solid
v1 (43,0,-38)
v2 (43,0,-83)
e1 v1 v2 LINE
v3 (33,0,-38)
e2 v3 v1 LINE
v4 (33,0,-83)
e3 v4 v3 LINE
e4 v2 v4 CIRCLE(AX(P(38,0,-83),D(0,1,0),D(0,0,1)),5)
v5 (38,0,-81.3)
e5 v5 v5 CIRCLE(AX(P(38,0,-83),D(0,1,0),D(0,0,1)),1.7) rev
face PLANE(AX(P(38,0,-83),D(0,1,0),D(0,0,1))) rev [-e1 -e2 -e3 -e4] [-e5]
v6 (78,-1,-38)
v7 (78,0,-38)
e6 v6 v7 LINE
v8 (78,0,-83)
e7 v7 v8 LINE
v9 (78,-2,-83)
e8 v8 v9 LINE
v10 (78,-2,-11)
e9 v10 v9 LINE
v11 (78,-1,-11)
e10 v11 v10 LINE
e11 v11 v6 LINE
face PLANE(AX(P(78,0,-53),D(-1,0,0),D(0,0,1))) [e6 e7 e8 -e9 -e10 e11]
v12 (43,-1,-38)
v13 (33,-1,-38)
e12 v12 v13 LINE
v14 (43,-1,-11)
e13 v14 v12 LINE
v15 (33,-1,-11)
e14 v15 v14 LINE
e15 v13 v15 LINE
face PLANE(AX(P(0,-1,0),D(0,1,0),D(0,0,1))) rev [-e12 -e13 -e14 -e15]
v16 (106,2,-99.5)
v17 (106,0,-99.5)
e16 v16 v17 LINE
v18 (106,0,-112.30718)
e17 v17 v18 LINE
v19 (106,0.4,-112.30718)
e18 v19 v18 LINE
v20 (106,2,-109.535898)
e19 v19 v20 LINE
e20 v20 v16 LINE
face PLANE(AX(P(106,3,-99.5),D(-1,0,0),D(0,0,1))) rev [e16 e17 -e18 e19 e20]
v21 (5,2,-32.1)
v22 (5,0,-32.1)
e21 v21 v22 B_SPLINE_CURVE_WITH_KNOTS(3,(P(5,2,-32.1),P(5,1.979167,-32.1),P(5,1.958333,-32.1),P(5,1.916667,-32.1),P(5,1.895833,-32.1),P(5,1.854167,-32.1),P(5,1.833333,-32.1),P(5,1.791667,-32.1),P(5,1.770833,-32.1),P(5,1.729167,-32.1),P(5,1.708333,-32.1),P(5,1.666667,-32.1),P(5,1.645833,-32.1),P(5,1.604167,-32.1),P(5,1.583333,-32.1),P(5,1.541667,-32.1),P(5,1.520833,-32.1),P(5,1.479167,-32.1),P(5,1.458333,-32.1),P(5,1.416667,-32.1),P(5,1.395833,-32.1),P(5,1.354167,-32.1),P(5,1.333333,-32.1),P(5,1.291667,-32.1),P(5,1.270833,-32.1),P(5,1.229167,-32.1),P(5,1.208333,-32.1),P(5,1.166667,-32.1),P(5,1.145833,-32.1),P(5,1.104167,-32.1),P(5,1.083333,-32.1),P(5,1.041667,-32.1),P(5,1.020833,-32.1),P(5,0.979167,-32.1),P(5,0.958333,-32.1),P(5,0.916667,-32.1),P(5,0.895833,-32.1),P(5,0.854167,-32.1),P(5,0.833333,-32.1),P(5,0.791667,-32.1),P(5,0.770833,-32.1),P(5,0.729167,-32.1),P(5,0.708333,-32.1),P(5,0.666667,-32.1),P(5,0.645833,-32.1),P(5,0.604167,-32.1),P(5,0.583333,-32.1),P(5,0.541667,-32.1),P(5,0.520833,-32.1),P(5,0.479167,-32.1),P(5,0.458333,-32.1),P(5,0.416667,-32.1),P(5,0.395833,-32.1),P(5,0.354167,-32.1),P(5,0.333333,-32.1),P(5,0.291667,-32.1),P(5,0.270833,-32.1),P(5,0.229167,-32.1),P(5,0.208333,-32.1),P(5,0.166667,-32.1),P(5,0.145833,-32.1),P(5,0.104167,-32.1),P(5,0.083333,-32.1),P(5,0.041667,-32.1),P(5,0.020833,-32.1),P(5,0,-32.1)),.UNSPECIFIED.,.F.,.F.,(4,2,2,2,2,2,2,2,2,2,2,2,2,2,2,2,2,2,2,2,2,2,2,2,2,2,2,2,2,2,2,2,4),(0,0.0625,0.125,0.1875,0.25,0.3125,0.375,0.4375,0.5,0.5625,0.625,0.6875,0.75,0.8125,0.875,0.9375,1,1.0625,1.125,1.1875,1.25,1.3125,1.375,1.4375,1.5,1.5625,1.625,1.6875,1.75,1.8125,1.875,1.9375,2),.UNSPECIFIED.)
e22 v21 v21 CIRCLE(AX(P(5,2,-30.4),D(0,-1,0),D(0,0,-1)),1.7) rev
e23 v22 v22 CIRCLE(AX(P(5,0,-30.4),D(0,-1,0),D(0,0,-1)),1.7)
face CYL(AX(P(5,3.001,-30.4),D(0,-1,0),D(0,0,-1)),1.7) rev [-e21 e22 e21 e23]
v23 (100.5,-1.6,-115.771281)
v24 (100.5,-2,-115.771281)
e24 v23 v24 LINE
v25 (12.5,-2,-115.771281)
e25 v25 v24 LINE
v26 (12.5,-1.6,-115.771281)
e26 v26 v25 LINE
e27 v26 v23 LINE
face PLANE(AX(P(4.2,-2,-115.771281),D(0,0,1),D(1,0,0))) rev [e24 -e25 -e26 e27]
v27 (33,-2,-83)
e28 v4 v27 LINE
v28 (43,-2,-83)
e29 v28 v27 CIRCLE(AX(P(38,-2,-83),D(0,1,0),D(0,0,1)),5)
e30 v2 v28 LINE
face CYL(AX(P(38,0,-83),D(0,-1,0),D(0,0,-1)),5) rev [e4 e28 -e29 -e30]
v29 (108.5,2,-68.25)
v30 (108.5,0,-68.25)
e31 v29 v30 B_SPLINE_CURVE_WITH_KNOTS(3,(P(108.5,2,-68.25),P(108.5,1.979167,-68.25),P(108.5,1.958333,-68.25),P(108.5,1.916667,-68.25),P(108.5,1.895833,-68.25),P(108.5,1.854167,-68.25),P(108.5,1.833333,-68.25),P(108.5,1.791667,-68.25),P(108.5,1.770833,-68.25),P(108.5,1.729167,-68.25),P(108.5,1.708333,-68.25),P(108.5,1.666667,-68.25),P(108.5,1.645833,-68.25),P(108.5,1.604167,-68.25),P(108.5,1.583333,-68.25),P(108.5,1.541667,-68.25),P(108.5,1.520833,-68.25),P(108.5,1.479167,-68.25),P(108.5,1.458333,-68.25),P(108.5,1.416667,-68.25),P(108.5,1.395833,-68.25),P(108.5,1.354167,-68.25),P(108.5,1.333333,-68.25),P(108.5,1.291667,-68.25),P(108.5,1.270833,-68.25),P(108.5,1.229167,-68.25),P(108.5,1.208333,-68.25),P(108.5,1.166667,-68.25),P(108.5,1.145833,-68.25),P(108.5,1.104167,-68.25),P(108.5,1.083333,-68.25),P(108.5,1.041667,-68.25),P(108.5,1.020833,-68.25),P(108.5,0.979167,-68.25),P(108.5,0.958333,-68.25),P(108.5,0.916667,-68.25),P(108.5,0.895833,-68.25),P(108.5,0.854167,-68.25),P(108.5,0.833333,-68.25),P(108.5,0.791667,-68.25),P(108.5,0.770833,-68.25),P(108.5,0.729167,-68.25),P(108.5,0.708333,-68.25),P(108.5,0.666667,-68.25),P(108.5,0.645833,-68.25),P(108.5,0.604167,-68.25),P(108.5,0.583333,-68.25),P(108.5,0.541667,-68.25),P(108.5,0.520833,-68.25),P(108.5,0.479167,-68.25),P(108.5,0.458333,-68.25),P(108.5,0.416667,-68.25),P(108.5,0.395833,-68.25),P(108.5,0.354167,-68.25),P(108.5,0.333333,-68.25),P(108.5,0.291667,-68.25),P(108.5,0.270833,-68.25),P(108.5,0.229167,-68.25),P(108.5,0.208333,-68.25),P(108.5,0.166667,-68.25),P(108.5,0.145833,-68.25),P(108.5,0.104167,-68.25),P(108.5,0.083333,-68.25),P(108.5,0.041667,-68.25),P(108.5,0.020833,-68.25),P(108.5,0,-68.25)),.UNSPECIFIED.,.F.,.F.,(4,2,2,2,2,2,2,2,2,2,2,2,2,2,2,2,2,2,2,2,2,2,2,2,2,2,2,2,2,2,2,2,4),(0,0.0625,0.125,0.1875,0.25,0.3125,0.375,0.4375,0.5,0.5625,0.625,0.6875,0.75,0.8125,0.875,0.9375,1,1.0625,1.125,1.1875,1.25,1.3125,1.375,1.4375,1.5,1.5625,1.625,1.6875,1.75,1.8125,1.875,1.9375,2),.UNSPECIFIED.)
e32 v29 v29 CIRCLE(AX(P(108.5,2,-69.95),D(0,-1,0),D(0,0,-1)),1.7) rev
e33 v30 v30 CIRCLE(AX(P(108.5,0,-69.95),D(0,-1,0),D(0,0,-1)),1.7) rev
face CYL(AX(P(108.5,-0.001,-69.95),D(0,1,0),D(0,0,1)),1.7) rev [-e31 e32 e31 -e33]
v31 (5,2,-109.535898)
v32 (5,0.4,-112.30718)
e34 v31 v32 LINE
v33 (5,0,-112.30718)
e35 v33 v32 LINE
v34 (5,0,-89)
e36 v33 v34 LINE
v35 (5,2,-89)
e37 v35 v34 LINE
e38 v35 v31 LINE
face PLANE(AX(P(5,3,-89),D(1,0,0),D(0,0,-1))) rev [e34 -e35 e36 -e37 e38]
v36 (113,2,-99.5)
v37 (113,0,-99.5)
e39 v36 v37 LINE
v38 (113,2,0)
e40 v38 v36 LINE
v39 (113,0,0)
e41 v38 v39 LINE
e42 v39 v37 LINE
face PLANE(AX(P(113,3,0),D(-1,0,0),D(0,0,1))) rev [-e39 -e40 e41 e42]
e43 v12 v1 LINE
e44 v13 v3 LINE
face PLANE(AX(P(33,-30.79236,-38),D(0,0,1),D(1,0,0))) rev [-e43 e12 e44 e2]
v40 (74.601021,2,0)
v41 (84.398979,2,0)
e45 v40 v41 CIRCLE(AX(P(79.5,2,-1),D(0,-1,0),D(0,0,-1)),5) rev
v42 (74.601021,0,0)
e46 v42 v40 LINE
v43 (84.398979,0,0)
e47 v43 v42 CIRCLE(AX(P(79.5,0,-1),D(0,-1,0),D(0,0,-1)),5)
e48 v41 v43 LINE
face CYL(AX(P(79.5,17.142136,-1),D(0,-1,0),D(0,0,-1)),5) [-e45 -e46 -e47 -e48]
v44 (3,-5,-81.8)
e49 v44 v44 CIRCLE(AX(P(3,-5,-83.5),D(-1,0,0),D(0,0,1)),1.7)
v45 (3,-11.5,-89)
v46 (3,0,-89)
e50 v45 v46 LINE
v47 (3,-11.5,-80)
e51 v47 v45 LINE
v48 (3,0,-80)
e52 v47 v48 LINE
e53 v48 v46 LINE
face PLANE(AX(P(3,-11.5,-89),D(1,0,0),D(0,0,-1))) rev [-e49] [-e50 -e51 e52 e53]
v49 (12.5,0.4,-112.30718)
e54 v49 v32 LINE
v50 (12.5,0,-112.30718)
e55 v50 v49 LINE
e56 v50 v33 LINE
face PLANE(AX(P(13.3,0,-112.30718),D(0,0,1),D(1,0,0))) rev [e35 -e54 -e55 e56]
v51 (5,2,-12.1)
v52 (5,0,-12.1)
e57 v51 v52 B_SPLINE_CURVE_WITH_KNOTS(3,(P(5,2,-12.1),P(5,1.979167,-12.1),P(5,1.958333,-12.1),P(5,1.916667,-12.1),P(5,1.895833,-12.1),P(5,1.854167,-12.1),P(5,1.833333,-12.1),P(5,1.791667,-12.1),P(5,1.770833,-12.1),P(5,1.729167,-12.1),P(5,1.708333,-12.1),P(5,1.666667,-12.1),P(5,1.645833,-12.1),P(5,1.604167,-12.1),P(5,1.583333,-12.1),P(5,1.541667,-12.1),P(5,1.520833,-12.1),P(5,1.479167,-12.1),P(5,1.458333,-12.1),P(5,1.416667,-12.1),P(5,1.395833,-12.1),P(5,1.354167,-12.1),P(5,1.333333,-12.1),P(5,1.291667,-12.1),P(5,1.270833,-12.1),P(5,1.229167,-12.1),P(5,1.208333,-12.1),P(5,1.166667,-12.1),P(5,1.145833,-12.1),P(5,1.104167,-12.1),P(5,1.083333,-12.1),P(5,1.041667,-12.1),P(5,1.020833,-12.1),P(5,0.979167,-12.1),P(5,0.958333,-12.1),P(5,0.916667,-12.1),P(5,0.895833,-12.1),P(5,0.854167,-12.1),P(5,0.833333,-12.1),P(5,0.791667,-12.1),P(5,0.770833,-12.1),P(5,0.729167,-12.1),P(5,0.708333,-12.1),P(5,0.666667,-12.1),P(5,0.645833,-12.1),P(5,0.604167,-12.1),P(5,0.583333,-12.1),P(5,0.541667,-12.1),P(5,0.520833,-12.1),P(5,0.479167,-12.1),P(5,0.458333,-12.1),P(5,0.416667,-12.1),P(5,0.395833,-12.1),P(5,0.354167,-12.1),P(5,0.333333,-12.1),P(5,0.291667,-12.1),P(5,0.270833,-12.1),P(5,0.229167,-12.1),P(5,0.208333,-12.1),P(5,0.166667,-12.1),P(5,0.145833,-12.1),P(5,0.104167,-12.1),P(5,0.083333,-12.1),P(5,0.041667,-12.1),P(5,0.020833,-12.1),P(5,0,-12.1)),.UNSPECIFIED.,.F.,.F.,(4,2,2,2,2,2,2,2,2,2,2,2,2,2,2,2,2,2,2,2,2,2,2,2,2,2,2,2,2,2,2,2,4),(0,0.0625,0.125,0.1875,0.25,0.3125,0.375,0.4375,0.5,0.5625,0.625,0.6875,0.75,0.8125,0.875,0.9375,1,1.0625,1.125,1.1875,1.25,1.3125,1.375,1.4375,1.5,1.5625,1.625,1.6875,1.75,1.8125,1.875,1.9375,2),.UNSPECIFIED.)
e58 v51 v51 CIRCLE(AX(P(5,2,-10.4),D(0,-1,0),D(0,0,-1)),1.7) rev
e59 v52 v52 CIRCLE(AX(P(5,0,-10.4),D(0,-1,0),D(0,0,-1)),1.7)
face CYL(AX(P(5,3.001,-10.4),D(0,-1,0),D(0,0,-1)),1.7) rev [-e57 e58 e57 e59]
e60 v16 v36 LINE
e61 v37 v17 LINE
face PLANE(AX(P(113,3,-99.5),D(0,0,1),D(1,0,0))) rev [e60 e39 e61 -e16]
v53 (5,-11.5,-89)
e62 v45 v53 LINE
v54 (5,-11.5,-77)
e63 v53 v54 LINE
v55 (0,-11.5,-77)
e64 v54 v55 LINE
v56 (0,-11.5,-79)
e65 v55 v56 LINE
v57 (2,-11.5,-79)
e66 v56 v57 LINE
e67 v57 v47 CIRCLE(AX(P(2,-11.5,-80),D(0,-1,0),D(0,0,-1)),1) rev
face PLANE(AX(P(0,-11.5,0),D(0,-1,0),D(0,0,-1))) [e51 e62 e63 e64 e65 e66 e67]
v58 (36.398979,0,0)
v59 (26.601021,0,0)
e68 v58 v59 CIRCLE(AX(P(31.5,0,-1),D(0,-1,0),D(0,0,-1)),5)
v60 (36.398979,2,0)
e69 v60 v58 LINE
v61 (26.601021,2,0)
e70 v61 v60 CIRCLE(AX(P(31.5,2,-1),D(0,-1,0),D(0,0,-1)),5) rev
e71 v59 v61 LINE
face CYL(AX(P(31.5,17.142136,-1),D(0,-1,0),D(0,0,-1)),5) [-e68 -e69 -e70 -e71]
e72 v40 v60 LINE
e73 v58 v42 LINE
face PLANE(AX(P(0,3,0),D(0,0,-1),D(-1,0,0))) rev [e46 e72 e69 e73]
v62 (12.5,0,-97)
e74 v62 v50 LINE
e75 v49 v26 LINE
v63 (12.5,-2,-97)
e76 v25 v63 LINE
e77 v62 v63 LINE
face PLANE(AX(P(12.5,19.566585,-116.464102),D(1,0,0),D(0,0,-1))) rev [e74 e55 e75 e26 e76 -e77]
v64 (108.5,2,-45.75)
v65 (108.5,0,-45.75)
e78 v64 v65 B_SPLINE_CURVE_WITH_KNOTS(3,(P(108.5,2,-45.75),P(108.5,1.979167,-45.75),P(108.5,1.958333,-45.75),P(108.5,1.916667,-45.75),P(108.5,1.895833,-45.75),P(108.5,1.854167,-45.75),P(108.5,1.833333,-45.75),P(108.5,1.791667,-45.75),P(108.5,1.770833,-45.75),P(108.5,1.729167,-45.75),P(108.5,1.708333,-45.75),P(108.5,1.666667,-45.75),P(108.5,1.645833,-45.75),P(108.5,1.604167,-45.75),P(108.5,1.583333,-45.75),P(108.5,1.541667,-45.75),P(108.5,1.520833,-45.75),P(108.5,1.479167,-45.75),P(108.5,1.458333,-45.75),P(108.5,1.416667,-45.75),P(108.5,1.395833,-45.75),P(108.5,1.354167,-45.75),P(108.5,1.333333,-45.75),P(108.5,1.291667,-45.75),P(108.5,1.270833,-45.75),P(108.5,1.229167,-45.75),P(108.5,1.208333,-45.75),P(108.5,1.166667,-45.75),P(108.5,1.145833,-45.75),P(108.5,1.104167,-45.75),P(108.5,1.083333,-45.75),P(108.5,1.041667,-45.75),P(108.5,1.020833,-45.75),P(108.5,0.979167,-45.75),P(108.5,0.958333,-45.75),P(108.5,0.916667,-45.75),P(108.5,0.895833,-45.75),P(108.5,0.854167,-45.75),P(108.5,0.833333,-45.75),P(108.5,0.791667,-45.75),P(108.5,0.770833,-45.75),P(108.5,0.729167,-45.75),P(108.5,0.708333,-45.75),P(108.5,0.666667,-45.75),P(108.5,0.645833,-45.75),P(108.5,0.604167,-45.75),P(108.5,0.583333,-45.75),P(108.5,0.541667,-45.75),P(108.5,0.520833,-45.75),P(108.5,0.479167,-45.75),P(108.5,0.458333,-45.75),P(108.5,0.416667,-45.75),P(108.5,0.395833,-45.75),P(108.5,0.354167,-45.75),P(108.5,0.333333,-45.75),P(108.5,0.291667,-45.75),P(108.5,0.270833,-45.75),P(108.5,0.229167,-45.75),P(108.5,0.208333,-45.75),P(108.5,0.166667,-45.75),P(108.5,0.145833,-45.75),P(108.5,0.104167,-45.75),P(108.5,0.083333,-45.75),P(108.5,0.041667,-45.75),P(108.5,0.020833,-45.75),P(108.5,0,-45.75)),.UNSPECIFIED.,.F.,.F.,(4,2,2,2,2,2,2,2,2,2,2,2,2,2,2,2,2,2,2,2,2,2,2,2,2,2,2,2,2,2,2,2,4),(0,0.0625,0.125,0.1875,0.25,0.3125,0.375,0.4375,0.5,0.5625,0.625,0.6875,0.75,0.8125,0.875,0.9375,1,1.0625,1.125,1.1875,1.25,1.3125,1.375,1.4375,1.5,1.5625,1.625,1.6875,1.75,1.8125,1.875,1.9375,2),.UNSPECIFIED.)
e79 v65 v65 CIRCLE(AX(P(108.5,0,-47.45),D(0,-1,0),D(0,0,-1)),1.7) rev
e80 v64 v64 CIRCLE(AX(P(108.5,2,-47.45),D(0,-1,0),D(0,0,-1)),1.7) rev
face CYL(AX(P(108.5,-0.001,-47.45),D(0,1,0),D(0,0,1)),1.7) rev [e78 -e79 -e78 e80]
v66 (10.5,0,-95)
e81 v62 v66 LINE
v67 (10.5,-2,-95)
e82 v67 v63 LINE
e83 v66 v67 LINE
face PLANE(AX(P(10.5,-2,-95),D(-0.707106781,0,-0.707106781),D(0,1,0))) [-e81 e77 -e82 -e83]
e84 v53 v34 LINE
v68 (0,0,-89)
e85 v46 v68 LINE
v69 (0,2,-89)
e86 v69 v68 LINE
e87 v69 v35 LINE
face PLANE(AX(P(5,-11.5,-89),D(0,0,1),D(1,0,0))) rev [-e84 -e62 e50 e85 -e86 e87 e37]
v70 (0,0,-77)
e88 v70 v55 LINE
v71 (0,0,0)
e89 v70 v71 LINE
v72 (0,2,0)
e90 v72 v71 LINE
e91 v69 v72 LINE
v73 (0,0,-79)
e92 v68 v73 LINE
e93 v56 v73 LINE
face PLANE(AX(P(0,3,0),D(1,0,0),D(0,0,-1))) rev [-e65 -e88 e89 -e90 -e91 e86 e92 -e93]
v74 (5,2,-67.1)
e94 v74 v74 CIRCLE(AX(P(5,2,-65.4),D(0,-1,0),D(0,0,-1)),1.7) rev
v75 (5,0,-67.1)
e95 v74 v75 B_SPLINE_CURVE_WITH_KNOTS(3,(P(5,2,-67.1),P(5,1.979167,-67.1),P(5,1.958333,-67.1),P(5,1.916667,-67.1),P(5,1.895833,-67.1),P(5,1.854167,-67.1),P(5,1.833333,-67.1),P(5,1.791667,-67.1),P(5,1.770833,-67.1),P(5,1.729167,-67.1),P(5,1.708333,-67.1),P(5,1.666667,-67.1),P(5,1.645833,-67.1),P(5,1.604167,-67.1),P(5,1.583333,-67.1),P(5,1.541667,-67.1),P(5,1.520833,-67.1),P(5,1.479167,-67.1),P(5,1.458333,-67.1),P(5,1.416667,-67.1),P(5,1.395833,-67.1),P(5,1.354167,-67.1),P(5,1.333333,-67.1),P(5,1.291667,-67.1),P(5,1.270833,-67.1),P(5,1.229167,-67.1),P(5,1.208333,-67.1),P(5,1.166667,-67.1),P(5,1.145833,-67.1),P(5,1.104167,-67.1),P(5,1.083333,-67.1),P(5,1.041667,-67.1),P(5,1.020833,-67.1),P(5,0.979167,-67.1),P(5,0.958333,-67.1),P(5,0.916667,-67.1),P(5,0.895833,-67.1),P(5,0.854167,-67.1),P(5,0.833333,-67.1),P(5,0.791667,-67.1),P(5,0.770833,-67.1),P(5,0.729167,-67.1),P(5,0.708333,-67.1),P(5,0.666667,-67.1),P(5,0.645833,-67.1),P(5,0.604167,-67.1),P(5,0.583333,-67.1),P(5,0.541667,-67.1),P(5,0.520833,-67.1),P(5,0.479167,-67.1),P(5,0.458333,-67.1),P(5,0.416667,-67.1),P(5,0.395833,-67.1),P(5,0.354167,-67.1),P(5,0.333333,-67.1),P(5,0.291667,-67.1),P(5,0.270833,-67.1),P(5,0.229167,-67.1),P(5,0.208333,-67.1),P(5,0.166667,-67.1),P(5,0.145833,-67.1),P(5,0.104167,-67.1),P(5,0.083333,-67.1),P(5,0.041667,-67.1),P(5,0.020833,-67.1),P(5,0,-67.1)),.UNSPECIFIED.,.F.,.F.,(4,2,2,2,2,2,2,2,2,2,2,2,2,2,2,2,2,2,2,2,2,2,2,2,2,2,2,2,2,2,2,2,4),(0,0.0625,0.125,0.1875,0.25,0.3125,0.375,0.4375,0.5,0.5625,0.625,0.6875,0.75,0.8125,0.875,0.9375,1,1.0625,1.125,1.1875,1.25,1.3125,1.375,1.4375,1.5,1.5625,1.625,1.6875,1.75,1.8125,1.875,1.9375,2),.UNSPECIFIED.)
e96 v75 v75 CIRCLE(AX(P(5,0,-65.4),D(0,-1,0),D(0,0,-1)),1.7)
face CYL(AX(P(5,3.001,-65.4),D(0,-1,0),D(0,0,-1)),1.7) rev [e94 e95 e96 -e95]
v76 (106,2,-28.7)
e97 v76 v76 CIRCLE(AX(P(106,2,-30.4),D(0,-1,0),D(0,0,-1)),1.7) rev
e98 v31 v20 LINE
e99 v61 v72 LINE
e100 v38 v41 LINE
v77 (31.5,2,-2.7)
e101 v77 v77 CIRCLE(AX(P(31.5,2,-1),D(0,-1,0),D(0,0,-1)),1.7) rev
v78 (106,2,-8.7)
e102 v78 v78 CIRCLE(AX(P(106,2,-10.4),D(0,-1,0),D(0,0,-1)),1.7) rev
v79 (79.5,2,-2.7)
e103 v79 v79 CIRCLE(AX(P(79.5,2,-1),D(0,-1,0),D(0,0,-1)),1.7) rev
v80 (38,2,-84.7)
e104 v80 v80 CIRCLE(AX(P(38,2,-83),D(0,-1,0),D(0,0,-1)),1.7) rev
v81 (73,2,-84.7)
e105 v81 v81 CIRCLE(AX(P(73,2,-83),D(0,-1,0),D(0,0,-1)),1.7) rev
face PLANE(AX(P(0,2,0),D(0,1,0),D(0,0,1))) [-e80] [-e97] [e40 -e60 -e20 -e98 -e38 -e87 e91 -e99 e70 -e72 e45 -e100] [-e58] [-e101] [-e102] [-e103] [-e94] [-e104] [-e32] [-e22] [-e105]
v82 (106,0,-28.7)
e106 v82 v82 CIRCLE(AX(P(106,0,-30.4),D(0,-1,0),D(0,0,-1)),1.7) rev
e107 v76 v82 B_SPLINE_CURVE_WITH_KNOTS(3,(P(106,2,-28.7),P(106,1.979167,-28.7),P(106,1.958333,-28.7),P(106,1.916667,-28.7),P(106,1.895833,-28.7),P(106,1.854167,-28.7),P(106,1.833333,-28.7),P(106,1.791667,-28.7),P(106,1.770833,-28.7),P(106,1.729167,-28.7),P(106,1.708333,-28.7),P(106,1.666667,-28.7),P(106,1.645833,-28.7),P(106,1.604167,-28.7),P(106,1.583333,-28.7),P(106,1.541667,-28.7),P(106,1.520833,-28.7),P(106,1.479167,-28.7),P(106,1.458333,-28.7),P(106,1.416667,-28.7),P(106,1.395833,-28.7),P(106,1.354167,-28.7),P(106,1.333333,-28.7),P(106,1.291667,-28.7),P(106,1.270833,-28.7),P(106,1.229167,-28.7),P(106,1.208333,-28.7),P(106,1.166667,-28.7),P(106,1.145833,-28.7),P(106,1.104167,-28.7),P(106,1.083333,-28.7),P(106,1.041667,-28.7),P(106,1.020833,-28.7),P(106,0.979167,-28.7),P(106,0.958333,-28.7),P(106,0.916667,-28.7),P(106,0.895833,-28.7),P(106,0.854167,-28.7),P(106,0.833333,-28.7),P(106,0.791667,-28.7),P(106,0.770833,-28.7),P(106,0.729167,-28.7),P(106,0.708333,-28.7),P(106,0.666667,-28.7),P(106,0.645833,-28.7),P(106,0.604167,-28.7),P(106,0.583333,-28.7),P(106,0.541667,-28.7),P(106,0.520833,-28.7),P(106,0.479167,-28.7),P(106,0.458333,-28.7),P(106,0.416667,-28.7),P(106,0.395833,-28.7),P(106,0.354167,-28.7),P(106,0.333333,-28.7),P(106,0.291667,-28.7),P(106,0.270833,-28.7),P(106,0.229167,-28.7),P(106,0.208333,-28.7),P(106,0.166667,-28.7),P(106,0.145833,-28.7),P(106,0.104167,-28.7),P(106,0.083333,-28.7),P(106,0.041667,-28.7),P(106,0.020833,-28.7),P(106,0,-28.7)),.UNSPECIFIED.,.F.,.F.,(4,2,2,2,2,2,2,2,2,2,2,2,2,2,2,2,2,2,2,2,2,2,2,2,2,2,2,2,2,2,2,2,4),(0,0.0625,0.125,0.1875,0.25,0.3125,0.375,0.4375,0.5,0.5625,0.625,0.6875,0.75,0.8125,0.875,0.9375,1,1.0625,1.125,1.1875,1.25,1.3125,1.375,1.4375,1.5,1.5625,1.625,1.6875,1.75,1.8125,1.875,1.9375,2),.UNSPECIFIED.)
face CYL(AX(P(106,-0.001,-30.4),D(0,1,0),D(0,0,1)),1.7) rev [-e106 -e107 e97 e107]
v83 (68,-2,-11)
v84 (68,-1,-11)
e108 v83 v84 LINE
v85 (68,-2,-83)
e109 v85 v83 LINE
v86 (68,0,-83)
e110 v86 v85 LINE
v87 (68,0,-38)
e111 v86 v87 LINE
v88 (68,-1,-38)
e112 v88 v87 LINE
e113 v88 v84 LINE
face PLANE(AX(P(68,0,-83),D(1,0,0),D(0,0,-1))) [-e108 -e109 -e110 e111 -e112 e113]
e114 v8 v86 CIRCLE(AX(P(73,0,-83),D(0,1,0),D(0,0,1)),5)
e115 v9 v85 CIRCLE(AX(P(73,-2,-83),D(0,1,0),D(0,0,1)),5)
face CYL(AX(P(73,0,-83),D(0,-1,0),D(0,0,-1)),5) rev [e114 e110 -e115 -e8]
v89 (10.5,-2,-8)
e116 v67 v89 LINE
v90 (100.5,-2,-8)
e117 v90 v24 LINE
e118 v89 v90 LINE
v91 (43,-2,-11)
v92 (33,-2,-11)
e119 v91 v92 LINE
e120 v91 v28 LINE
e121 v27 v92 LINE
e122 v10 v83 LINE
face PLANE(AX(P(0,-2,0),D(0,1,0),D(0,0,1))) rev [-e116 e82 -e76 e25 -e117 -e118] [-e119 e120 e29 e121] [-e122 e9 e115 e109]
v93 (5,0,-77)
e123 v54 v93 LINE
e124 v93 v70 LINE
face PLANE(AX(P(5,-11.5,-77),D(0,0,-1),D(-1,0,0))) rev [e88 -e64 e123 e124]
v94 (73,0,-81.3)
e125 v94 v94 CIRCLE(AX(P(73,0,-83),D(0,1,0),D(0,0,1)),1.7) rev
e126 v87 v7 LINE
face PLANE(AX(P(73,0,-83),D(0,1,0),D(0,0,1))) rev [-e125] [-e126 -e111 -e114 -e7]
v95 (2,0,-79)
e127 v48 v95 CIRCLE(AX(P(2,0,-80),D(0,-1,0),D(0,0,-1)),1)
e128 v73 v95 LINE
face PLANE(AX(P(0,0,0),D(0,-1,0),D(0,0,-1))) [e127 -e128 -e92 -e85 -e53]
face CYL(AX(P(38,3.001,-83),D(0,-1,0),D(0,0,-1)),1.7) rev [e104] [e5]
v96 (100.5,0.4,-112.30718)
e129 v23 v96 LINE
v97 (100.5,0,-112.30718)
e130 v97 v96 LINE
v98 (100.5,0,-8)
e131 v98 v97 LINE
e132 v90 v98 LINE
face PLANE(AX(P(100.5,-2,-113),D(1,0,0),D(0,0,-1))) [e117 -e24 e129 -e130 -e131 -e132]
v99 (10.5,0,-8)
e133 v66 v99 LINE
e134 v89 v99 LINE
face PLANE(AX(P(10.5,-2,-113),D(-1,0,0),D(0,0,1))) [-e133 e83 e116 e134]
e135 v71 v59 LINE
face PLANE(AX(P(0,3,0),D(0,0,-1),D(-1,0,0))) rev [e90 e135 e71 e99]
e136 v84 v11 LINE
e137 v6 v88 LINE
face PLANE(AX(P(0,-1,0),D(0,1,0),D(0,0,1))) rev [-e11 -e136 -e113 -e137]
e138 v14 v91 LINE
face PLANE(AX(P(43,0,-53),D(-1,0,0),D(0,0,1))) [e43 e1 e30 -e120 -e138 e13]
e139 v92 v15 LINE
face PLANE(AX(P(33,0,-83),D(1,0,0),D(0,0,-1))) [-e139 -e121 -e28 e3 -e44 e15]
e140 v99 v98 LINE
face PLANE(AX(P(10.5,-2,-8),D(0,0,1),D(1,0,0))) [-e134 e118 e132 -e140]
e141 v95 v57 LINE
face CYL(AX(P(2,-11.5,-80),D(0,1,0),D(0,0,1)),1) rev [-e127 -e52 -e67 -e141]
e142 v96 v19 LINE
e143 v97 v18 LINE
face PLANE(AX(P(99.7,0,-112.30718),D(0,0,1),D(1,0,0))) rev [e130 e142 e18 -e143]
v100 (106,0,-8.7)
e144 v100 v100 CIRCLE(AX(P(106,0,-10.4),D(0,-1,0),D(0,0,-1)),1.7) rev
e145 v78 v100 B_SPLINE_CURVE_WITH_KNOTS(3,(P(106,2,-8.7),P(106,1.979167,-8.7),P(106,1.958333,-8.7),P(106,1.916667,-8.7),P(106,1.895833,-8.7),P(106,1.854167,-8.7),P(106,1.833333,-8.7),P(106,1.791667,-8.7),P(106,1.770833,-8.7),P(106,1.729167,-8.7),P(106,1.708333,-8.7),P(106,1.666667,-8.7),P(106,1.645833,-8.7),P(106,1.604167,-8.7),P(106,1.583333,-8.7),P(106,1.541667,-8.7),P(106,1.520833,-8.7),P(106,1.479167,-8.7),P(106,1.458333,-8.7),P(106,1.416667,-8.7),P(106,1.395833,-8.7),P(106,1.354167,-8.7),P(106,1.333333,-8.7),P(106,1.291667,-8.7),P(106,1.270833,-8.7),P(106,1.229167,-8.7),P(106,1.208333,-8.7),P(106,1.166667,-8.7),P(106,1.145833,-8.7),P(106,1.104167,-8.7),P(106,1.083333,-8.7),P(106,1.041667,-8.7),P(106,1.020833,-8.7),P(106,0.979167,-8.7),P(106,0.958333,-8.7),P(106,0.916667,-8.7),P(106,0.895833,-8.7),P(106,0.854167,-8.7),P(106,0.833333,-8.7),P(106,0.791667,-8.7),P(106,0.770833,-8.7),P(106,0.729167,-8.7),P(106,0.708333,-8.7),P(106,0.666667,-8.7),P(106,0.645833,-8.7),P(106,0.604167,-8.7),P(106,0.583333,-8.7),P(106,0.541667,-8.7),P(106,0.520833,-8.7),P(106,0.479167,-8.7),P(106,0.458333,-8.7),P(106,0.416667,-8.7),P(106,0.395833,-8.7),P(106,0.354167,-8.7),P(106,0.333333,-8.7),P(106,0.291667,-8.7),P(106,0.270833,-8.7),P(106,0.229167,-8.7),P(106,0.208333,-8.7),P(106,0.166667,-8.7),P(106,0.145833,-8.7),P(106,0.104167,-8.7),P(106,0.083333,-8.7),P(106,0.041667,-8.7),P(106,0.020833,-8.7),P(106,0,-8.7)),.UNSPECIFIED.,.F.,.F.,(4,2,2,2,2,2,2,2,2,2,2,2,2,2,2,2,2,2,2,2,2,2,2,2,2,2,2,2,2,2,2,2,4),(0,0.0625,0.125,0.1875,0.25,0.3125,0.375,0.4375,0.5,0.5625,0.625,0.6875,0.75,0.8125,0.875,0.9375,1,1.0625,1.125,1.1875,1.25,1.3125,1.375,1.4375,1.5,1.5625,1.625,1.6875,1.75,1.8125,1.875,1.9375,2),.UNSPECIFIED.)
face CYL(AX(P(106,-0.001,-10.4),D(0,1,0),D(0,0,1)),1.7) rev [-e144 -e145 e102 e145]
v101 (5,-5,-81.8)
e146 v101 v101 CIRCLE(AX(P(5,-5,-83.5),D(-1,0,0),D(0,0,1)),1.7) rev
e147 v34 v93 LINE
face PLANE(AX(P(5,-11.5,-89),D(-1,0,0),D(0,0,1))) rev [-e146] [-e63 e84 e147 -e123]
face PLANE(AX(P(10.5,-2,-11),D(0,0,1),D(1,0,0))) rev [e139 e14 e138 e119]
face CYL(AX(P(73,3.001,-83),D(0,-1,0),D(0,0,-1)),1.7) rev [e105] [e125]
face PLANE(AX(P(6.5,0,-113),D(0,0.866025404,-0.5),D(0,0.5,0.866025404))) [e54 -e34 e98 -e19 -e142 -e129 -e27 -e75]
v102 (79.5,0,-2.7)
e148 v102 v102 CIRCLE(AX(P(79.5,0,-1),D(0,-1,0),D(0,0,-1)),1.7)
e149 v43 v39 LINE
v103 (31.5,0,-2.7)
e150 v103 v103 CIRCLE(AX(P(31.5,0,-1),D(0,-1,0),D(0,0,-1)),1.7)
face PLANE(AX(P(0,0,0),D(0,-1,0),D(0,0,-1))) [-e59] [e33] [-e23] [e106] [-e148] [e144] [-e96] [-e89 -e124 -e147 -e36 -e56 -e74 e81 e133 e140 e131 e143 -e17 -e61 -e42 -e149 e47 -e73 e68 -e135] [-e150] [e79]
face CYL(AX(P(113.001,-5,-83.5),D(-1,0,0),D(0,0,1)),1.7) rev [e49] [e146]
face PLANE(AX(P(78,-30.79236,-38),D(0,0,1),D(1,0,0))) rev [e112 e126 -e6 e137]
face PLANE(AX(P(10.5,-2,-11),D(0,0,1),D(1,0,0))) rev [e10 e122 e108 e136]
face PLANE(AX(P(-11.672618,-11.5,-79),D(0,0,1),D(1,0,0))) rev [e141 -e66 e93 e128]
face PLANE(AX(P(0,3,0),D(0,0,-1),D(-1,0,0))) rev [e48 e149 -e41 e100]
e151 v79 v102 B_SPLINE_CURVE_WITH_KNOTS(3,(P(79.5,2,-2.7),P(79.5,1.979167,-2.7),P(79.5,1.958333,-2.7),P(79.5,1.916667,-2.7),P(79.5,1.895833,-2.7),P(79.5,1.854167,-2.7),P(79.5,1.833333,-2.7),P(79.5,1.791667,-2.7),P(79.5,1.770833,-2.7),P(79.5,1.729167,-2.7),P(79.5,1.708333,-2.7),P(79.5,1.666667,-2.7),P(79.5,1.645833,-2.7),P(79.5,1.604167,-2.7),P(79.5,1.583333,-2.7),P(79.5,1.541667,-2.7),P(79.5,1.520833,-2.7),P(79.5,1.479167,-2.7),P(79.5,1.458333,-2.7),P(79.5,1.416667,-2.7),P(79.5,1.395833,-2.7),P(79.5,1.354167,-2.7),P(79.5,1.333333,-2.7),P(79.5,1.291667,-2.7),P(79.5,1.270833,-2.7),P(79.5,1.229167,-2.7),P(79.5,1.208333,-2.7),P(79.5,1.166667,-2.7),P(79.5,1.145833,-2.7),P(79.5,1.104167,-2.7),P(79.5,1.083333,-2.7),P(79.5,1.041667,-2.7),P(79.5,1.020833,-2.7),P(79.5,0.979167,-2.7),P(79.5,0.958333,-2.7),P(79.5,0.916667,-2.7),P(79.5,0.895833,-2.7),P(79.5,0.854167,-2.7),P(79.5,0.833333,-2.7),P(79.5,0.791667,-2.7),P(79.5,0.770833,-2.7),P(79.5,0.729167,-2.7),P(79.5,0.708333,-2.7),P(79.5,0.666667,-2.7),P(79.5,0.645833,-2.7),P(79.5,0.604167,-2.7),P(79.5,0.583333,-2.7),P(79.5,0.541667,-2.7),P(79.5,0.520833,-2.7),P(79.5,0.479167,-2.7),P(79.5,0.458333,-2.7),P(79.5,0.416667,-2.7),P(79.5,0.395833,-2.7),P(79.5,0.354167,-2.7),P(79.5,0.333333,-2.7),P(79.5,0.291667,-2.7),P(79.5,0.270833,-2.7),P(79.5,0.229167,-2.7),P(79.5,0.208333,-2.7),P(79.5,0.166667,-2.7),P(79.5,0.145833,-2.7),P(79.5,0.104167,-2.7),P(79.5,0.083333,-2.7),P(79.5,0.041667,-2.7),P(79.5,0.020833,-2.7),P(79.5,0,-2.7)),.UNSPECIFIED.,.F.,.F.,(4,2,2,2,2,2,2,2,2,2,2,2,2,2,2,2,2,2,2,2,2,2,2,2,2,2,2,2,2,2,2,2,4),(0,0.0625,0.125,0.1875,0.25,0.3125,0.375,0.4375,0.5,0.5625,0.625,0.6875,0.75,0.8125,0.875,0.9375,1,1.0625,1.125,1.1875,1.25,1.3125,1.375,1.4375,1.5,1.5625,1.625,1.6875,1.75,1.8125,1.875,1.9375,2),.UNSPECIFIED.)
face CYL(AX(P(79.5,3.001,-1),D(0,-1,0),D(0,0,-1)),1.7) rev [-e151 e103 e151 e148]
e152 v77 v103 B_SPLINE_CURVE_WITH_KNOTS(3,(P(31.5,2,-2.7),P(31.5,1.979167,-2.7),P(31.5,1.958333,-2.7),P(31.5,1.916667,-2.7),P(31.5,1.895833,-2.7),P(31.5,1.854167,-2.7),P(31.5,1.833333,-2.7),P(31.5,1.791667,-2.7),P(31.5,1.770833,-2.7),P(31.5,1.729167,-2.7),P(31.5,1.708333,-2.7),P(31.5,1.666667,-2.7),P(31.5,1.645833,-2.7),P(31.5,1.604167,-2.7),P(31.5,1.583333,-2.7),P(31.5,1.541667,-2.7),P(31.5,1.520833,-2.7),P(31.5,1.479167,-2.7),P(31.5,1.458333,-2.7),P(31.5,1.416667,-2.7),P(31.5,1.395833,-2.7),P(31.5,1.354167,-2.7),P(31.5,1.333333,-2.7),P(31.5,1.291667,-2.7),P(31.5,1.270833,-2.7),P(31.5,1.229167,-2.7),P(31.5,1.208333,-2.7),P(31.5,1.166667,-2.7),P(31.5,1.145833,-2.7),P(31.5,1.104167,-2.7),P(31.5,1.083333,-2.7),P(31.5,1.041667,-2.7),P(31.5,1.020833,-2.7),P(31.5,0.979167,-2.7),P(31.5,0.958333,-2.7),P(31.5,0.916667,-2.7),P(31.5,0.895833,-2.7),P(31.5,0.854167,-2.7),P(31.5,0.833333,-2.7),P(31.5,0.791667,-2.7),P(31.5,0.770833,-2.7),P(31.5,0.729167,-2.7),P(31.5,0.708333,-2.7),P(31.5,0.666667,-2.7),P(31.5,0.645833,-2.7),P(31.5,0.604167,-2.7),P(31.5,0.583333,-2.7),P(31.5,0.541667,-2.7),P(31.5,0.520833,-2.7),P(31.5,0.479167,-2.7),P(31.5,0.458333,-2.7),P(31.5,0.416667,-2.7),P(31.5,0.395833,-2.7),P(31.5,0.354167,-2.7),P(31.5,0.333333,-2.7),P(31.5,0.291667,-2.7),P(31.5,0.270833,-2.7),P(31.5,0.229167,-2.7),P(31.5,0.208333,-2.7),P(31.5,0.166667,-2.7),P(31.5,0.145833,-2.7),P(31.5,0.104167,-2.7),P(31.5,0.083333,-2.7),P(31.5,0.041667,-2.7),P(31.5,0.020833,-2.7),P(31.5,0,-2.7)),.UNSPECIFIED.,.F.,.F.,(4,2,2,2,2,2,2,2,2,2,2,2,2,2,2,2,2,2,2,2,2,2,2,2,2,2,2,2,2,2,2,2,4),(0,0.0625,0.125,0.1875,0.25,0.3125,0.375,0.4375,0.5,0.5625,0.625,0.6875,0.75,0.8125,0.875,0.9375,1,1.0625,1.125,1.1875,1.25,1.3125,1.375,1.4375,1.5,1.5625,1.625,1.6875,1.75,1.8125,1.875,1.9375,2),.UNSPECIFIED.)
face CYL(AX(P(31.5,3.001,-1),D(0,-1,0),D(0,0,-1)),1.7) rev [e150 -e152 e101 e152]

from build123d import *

# Parameters (mm, degrees)
SKETCH_1_W           = 113
SKETCH_1_H           = 113
EXTRUDE_1_DEPTH      = 3
CUT_EXTRUDE_1_REACH  = 161.834
SKETCH_2_R           = 1.7
SKETCH_3_W           = 90
SKETCH_3_H           = 105
EXTRUDE_2_DEPTH      = 2
SKETCH_5_R           = 5
EXTRUDE_3_DEPTH      = 3
CUT_EXTRUDE_2_REACH  = 161.834
SKETCH_6_R           = 1.7
CUT_EXTRUDE_3_REACH  = 161.834
SKETCH_7_R           = 1.7
CUT_EXTRUDE_4_REACH  = 161.884
SKETCH_8_R           = 1.7
EXTRUDE_5_DEPTH      = 90
CUT_EXTRUDE_5_DEPTH  = 2
SKETCH_13_W          = 2
SKETCH_13_H          = 12
EXTRUDE_6_DEPTH      = 11.5
CUT_EXTRUDE_6_REACH  = 162.612
SKETCH_14_R          = 1.7
CUT_EXTRUDE_7_REACH  = 164.681
EXTRUDE_7_DEPTH      = 8.5
SKETCH_17_W          = 2
SKETCH_17_H          = 11.5
EXTRUDE_8_DEPTH      = 3
FILLET_1_R           = 1
CUT_EXTRUDE_8_DEPTH  = 163.681089759
SKETCH_20_W          = 113
SKETCH_20_H          = 12.124355653
CUT_EXTRUDE_9_DEPTH  = 1
CHAMFER_1_SIZE       = 1
SKETCH_21_W          = 7
SKETCH_21_H          = 13.5
CUT_EXTRUDE_10_DEPTH = 163.681089759
SKETCH_22_W          = 5
SKETCH_22_H          = 24
CUT_EXTRUDE_11_DEPTH = 163.681089759
SKETCH_23_W          = 2
SKETCH_23_H          = 19.464101615
CUT_EXTRUDE_12_DEPTH = 2
CHAMFER_2_SIZE       = 2
SKETCH_24_W          = 0.692820323
SKETCH_24_H          = 0.4
CUT_EXTRUDE_13_DEPTH = 95.5
SKETCH_25_W          = 0.692820323
SKETCH_25_H          = 0.4
CUT_EXTRUDE_14_DEPTH = 5.5
SKETCH_26_W          = 0.692820323
SKETCH_26_H          = 0.4
CUT_EXTRUDE_15_DEPTH = 7.5
SKETCH_27_W          = 113
SKETCH_27_H          = 105.875644347
CUT_EXTRUDE_16_DEPTH = 163.339889035
SKETCH_29_W          = 10
SKETCH_29_H          = 5
CUT_EXTRUDE_17_DEPTH = 163.185818036
SKETCH_30_W          = 10
SKETCH_30_H          = 2
CUT_EXTRUDE_18_DEPTH = 37
SKETCH_31_W          = 10
SKETCH_31_H          = 27
EXTRUDE_9_DEPTH      = 1


with BuildPart() as part:
    # 草图1 → 凸台-拉伸1 (new body)
    with BuildSketch(Plane(origin=(0, 0, 0), x_dir=(1, 0, 0), z_dir=(0, 1, 0))):
        with Locations((56.5, 56.5)):
            Rectangle(SKETCH_1_W, SKETCH_1_H)
    extrude(amount=EXTRUDE_1_DEPTH)

    # 草图2 → 切除-拉伸1 (cut, up to next)
    with BuildSketch(Plane(origin=(0, 3, 0), x_dir=(1, 0, 0), z_dir=(0, 1, 0)), mode=Mode.PRIVATE) as cut_extrude_1_sk1:
        with Locations(Location((108.5, 69.95, 0), (0, 0, 270))):
            Circle(SKETCH_2_R)
    cut_extrude_1_tool1 = extrude(cut_extrude_1_sk1.sketch, amount=-CUT_EXTRUDE_1_REACH, mode=Mode.PRIVATE) & part.part
    # 草图2 → 切除-拉伸1 (cut, up to next)
    with BuildSketch(Plane(origin=(0, 3, 0), x_dir=(1, 0, 0), z_dir=(0, 1, 0)), mode=Mode.PRIVATE) as cut_extrude_1_sk2:
        with Locations(Location((108.5, 47.45, 0), (0, 0, 270))):
            Circle(SKETCH_2_R)
    cut_extrude_1_tool2 = extrude(cut_extrude_1_sk2.sketch, amount=-CUT_EXTRUDE_1_REACH, mode=Mode.PRIVATE) & part.part
    # 草图2 → 切除-拉伸1 (cut, up to next)
    with BuildSketch(Plane(origin=(0, 3, 0), x_dir=(1, 0, 0), z_dir=(0, 1, 0)), mode=Mode.PRIVATE) as cut_extrude_1_sk3:
        with Locations(Location((106, 30.4, 0), (0, 0, 270))):
            Circle(SKETCH_2_R)
    cut_extrude_1_tool3 = extrude(cut_extrude_1_sk3.sketch, amount=-CUT_EXTRUDE_1_REACH, mode=Mode.PRIVATE) & part.part
    # 草图2 → 切除-拉伸1 (cut, up to next)
    with BuildSketch(Plane(origin=(0, 3, 0), x_dir=(1, 0, 0), z_dir=(0, 1, 0)), mode=Mode.PRIVATE) as cut_extrude_1_sk4:
        with Locations(Location((106, 10.4, 0), (0, 0, 270))):
            Circle(SKETCH_2_R)
    cut_extrude_1_tool4 = extrude(cut_extrude_1_sk4.sketch, amount=-CUT_EXTRUDE_1_REACH, mode=Mode.PRIVATE) & part.part
    add(cut_extrude_1_tool1.solids().sort_by_distance((108.5, 3, -69.95))[0], mode=Mode.SUBTRACT)
    add(cut_extrude_1_tool2.solids().sort_by_distance((108.5, 3, -47.45))[0], mode=Mode.SUBTRACT)
    add(cut_extrude_1_tool3.solids().sort_by_distance((106, 3, -30.4))[0], mode=Mode.SUBTRACT)
    add(cut_extrude_1_tool4.solids().sort_by_distance((106, 3, -10.4))[0], mode=Mode.SUBTRACT)

    # 草图3 → 凸台-拉伸2 (add)
    with BuildSketch(Plane(origin=(0, 0, 0), x_dir=(1, 0, 0), z_dir=(0, 1, 0))):
        with Locations((55.5, 60.5)):
            Rectangle(SKETCH_3_W, SKETCH_3_H)
    extrude(amount=-EXTRUDE_2_DEPTH)

    # 草图5 → 凸台-拉伸3 (add)
    with BuildSketch(Plane.XZ):
        with Locations((79.5, -1)):
            Circle(SKETCH_5_R)
        with Locations((31.5, -1)):
            Circle(SKETCH_5_R)
    extrude(amount=-EXTRUDE_3_DEPTH)

    # 草图6 → 切除-拉伸2 (cut, up to next)
    with BuildSketch(Plane.XZ, mode=Mode.PRIVATE) as cut_extrude_2_sk1:
        with Locations(Location((31.5, -1, 0), (0, 0, 270))):
            Circle(SKETCH_6_R)
    cut_extrude_2_tool1 = extrude(cut_extrude_2_sk1.sketch, amount=-CUT_EXTRUDE_2_REACH, mode=Mode.PRIVATE) & part.part
    # 草图6 → 切除-拉伸2 (cut, up to next)
    with BuildSketch(Plane.XZ, mode=Mode.PRIVATE) as cut_extrude_2_sk2:
        with Locations(Location((79.5, -1, 0), (0, 0, 270))):
            Circle(SKETCH_6_R)
    cut_extrude_2_tool2 = extrude(cut_extrude_2_sk2.sketch, amount=-CUT_EXTRUDE_2_REACH, mode=Mode.PRIVATE) & part.part
    add(cut_extrude_2_tool1.solids().sort_by_distance((31.5, 0, -1))[0], mode=Mode.SUBTRACT)
    add(cut_extrude_2_tool2.solids().sort_by_distance((79.5, 0, -1))[0], mode=Mode.SUBTRACT)

    # 草图7 → 切除-拉伸3 (cut, up to next)
    with BuildSketch(Plane.XZ, mode=Mode.PRIVATE) as cut_extrude_3_sk1:
        with Locations(Location((5, -10.4, 0), (0, 0, 270))):
            Circle(SKETCH_7_R)
    cut_extrude_3_tool1 = extrude(cut_extrude_3_sk1.sketch, amount=-CUT_EXTRUDE_3_REACH, mode=Mode.PRIVATE) & part.part
    # 草图7 → 切除-拉伸3 (cut, up to next)
    with BuildSketch(Plane.XZ, mode=Mode.PRIVATE) as cut_extrude_3_sk2:
        with Locations(Location((5, -30.4, 0), (0, 0, 270))):
            Circle(SKETCH_7_R)
    cut_extrude_3_tool2 = extrude(cut_extrude_3_sk2.sketch, amount=-CUT_EXTRUDE_3_REACH, mode=Mode.PRIVATE) & part.part
    # 草图7 → 切除-拉伸3 (cut, up to next)
    with BuildSketch(Plane.XZ, mode=Mode.PRIVATE) as cut_extrude_3_sk3:
        with Locations(Location((5, -65.4, 0), (0, 0, 270))):
            Circle(SKETCH_7_R)
    cut_extrude_3_tool3 = extrude(cut_extrude_3_sk3.sketch, amount=-CUT_EXTRUDE_3_REACH, mode=Mode.PRIVATE) & part.part
    add(cut_extrude_3_tool1.solids().sort_by_distance((5, 0, -10.4))[0], mode=Mode.SUBTRACT)
    add(cut_extrude_3_tool2.solids().sort_by_distance((5, 0, -30.4))[0], mode=Mode.SUBTRACT)
    add(cut_extrude_3_tool3.solids().sort_by_distance((5, 0, -65.4))[0], mode=Mode.SUBTRACT)

    # 草图8 → 切除-拉伸4 (cut, up to next)
    with BuildSketch(Plane.XZ.offset(2), mode=Mode.PRIVATE) as cut_extrude_4_sk1:
        with Locations(Location((38, -83, 0), (0, 0, 270))):
            Circle(SKETCH_8_R)
    cut_extrude_4_tool1 = extrude(cut_extrude_4_sk1.sketch, amount=-CUT_EXTRUDE_4_REACH, mode=Mode.PRIVATE) & part.part
    # 草图8 → 切除-拉伸4 (cut, up to next)
    with BuildSketch(Plane.XZ.offset(2), mode=Mode.PRIVATE) as cut_extrude_4_sk2:
        with Locations(Location((73, -83, 0), (0, 0, 270))):
            Circle(SKETCH_8_R)
    cut_extrude_4_tool2 = extrude(cut_extrude_4_sk2.sketch, amount=-CUT_EXTRUDE_4_REACH, mode=Mode.PRIVATE) & part.part
    add(cut_extrude_4_tool1.solids().sort_by_distance((38, -2, -83))[0], mode=Mode.SUBTRACT)
    add(cut_extrude_4_tool2.solids().sort_by_distance((73, -2, -83))[0], mode=Mode.SUBTRACT)

    # 草图10 → 凸台-拉伸5 (add)
    with BuildSketch(Plane(origin=(100.5, 0, 0), x_dir=(0, 0, -1), z_dir=(1, 0, 0))):
        Polygon((113, 0), (116.464101615, -2), (113, -2), align=None)
    extrude(amount=-EXTRUDE_5_DEPTH)

    # 草图11 → 切除-拉伸5 (cut)
    with BuildSketch(Plane(origin=(0, -2, 0), x_dir=(1, 0, 0), z_dir=(0, 1, 0))):
        with BuildLine():
            Line((33, 83), (33, 53))
            ThreePointArc((33, 53), (38, 48), (43, 53))
            Line((43, 53), (43, 83))
            ThreePointArc((43, 83), (38, 88), (33, 83))
        make_face()
        with BuildLine():
            Line((68, 83), (68, 53))
            ThreePointArc((68, 53), (73, 48), (78, 53))
            Line((78, 53), (78, 83))
            ThreePointArc((78, 83), (73, 88), (68, 83))
        make_face()
    extrude(amount=CUT_EXTRUDE_5_DEPTH, mode=Mode.SUBTRACT)

    # 草图13 → 凸台-拉伸6 (add)
    with BuildSketch(Plane.XZ):
        with Locations((4, -83)):
            Rectangle(SKETCH_13_W, SKETCH_13_H)
    extrude(amount=EXTRUDE_6_DEPTH)

    # 草图14 → 切除-拉伸6 (cut, up to next)
    with BuildSketch(Plane.ZY.offset(-3), mode=Mode.PRIVATE) as cut_extrude_6_sk1:
        with Locations((-83.5, -5)):
            Circle(SKETCH_14_R)
    cut_extrude_6_tool1 = extrude(cut_extrude_6_sk1.sketch, amount=-CUT_EXTRUDE_6_REACH, mode=Mode.PRIVATE) & part.part
    add(cut_extrude_6_tool1.solids().sort_by_distance((3, -5, -83.5))[0], mode=Mode.SUBTRACT)

    # 草图15 → 切除-拉伸7 (cut, up to next)
    with BuildSketch(Plane.XZ, mode=Mode.PRIVATE) as cut_extrude_7_sk1:
        Polygon((113, -100.875644347), (106, -113), (113, -113), align=None)
    cut_extrude_7_tool1 = extrude(cut_extrude_7_sk1.sketch, amount=-CUT_EXTRUDE_7_REACH, mode=Mode.PRIVATE) & part.part
    add(cut_extrude_7_tool1.solids().sort_by_distance((110.666667, 0, -108.958548))[0], mode=Mode.SUBTRACT)

    # 草图16 → 凸台-拉伸7 (add)
    with BuildSketch(Plane.XZ):
        Polygon((113, -99.5), (107.5, -99.5), (107.5, -110.401923789), (113, -100.875644347), align=None)
    extrude(amount=EXTRUDE_7_DEPTH)

    # 草图17 → 凸台-拉伸8 (add)
    with BuildSketch(Plane.ZY.offset(-3)):
        with Locations((-78, -5.75)):
            Rectangle(SKETCH_17_W, SKETCH_17_H)
    extrude(amount=EXTRUDE_8_DEPTH)

    # 圆角1
    fillet_1_edges = [part.edges().sort_by_distance(p)[0] for p in [
        (3, -5.75, -79),
    ]]
    fillet(fillet_1_edges, radius=FILLET_1_R)

    # 草图19 → 切除-拉伸8 (cut, through all)
    with BuildSketch(Plane.ZY):
        Polygon((-113, 0), (-107.803847577, 3), (-113, 3), align=None)
    extrude(amount=-CUT_EXTRUDE_8_DEPTH, mode=Mode.SUBTRACT)

    # 草图20 → 切除-拉伸9 (cut)
    with BuildSketch(Plane(origin=(0, 3, 0), x_dir=(1, 0, 0), z_dir=(0, 1, 0))):
        with Locations((56.5, 106.937822173)):
            Rectangle(SKETCH_20_W, SKETCH_20_H)
    extrude(amount=-CUT_EXTRUDE_9_DEPTH, mode=Mode.SUBTRACT)

    # 倒角1
    chamfer_1_edges = [part.edges().sort_by_distance(p)[0] for p in [
        (56.5, 2, -100.875644347),
    ]]
    chamfer(chamfer_1_edges, length=CHAMFER_1_SIZE - 0.0001)  # a hair under: the kernel refuses the full size

    # 草图21 → 切除-拉伸10 (cut, through all)
    with BuildSketch(Plane.XZ.offset(8.5)):
        with Locations((109.5, -106.25)):
            Rectangle(SKETCH_21_W, SKETCH_21_H)
    extrude(amount=-CUT_EXTRUDE_10_DEPTH, mode=Mode.SUBTRACT)

    # 草图22 → 切除-拉伸11 (cut, through all)
    with BuildSketch(Plane.XZ):
        with Locations((2.5, -101)):
            Rectangle(SKETCH_22_W, SKETCH_22_H)
    extrude(amount=-CUT_EXTRUDE_11_DEPTH, mode=Mode.SUBTRACT)

    # 草图23 → 切除-拉伸12 (cut)
    with BuildSketch(Plane.XZ.offset(2)):
        with Locations((11.5, -106.732050808)):
            Rectangle(SKETCH_23_W, SKETCH_23_H)
    extrude(amount=-CUT_EXTRUDE_12_DEPTH, mode=Mode.SUBTRACT)

    # 倒角2
    chamfer_2_edges = [part.edges().sort_by_distance(p)[0] for p in [
        (10.5, -1, -97),
    ]]
    chamfer(chamfer_2_edges, length=CHAMFER_2_SIZE - 0.0001)  # a hair under: the kernel refuses the full size

    # 草图24 → 切除-拉伸13 (cut)
    with BuildSketch(Plane(origin=(100.5, 0, 0), x_dir=(0, 0, -1), z_dir=(1, 0, 0))):
        with Locations((116.117691454, -1.8)):
            Rectangle(SKETCH_24_W, SKETCH_24_H)
    extrude(amount=-CUT_EXTRUDE_13_DEPTH, mode=Mode.SUBTRACT)

    # 草图25 → 切除-拉伸14 (cut)
    with BuildSketch(Plane(origin=(106, 0, 0), x_dir=(0, 0, -1), z_dir=(1, 0, 0))):
        with Locations((112.653589839, 0.2)):
            Rectangle(SKETCH_25_W, SKETCH_25_H)
    extrude(amount=-CUT_EXTRUDE_14_DEPTH, mode=Mode.SUBTRACT)

    # 草图26 → 切除-拉伸15 (cut)
    with BuildSketch(Plane.ZY.offset(-5)):
        with Locations((-112.653589839, 0.2)):
            Rectangle(SKETCH_26_W, SKETCH_26_H)
    extrude(amount=-CUT_EXTRUDE_15_DEPTH, mode=Mode.SUBTRACT)

    # 草图27 → 切除-拉伸16 (cut, through all)
    with BuildSketch(Plane(origin=(0, 2, 0), x_dir=(1, 0, 0), z_dir=(0, 1, 0))):
        with Locations((56.5, 48.937822174)):
            Rectangle(SKETCH_27_W, SKETCH_27_H)
    extrude(amount=CUT_EXTRUDE_16_DEPTH, mode=Mode.SUBTRACT)

    # 草图29 → 切除-拉伸17 (cut, through all)
    with BuildSketch(Plane.XZ):
        with Locations((38, -50.5)):
            Rectangle(SKETCH_29_W, SKETCH_29_H)
        with Locations((73, -50.5)):
            Rectangle(SKETCH_29_W, SKETCH_29_H)
    extrude(amount=CUT_EXTRUDE_17_DEPTH, mode=Mode.SUBTRACT)

    # 草图30 → 切除-拉伸18 (cut)
    with BuildSketch(Plane(origin=(0, 0, -48), x_dir=(-1, 0, 0), z_dir=(0, 0, -1))):
        with Locations((-38, -1)):
            Rectangle(SKETCH_30_W, SKETCH_30_H)
        with Locations((-73, -1)):
            Rectangle(SKETCH_30_W, SKETCH_30_H)
    extrude(amount=-CUT_EXTRUDE_18_DEPTH, mode=Mode.SUBTRACT)

    # 草图31 → 凸台-拉伸9 (add)
    with BuildSketch(Plane.XZ):
        with Locations((38, -24.5)):
            Rectangle(SKETCH_31_W, SKETCH_31_H)
        with Locations((73, -24.5)):
            Rectangle(SKETCH_31_W, SKETCH_31_H)
    extrude(amount=EXTRUDE_9_DEPTH)


solid = part.part
